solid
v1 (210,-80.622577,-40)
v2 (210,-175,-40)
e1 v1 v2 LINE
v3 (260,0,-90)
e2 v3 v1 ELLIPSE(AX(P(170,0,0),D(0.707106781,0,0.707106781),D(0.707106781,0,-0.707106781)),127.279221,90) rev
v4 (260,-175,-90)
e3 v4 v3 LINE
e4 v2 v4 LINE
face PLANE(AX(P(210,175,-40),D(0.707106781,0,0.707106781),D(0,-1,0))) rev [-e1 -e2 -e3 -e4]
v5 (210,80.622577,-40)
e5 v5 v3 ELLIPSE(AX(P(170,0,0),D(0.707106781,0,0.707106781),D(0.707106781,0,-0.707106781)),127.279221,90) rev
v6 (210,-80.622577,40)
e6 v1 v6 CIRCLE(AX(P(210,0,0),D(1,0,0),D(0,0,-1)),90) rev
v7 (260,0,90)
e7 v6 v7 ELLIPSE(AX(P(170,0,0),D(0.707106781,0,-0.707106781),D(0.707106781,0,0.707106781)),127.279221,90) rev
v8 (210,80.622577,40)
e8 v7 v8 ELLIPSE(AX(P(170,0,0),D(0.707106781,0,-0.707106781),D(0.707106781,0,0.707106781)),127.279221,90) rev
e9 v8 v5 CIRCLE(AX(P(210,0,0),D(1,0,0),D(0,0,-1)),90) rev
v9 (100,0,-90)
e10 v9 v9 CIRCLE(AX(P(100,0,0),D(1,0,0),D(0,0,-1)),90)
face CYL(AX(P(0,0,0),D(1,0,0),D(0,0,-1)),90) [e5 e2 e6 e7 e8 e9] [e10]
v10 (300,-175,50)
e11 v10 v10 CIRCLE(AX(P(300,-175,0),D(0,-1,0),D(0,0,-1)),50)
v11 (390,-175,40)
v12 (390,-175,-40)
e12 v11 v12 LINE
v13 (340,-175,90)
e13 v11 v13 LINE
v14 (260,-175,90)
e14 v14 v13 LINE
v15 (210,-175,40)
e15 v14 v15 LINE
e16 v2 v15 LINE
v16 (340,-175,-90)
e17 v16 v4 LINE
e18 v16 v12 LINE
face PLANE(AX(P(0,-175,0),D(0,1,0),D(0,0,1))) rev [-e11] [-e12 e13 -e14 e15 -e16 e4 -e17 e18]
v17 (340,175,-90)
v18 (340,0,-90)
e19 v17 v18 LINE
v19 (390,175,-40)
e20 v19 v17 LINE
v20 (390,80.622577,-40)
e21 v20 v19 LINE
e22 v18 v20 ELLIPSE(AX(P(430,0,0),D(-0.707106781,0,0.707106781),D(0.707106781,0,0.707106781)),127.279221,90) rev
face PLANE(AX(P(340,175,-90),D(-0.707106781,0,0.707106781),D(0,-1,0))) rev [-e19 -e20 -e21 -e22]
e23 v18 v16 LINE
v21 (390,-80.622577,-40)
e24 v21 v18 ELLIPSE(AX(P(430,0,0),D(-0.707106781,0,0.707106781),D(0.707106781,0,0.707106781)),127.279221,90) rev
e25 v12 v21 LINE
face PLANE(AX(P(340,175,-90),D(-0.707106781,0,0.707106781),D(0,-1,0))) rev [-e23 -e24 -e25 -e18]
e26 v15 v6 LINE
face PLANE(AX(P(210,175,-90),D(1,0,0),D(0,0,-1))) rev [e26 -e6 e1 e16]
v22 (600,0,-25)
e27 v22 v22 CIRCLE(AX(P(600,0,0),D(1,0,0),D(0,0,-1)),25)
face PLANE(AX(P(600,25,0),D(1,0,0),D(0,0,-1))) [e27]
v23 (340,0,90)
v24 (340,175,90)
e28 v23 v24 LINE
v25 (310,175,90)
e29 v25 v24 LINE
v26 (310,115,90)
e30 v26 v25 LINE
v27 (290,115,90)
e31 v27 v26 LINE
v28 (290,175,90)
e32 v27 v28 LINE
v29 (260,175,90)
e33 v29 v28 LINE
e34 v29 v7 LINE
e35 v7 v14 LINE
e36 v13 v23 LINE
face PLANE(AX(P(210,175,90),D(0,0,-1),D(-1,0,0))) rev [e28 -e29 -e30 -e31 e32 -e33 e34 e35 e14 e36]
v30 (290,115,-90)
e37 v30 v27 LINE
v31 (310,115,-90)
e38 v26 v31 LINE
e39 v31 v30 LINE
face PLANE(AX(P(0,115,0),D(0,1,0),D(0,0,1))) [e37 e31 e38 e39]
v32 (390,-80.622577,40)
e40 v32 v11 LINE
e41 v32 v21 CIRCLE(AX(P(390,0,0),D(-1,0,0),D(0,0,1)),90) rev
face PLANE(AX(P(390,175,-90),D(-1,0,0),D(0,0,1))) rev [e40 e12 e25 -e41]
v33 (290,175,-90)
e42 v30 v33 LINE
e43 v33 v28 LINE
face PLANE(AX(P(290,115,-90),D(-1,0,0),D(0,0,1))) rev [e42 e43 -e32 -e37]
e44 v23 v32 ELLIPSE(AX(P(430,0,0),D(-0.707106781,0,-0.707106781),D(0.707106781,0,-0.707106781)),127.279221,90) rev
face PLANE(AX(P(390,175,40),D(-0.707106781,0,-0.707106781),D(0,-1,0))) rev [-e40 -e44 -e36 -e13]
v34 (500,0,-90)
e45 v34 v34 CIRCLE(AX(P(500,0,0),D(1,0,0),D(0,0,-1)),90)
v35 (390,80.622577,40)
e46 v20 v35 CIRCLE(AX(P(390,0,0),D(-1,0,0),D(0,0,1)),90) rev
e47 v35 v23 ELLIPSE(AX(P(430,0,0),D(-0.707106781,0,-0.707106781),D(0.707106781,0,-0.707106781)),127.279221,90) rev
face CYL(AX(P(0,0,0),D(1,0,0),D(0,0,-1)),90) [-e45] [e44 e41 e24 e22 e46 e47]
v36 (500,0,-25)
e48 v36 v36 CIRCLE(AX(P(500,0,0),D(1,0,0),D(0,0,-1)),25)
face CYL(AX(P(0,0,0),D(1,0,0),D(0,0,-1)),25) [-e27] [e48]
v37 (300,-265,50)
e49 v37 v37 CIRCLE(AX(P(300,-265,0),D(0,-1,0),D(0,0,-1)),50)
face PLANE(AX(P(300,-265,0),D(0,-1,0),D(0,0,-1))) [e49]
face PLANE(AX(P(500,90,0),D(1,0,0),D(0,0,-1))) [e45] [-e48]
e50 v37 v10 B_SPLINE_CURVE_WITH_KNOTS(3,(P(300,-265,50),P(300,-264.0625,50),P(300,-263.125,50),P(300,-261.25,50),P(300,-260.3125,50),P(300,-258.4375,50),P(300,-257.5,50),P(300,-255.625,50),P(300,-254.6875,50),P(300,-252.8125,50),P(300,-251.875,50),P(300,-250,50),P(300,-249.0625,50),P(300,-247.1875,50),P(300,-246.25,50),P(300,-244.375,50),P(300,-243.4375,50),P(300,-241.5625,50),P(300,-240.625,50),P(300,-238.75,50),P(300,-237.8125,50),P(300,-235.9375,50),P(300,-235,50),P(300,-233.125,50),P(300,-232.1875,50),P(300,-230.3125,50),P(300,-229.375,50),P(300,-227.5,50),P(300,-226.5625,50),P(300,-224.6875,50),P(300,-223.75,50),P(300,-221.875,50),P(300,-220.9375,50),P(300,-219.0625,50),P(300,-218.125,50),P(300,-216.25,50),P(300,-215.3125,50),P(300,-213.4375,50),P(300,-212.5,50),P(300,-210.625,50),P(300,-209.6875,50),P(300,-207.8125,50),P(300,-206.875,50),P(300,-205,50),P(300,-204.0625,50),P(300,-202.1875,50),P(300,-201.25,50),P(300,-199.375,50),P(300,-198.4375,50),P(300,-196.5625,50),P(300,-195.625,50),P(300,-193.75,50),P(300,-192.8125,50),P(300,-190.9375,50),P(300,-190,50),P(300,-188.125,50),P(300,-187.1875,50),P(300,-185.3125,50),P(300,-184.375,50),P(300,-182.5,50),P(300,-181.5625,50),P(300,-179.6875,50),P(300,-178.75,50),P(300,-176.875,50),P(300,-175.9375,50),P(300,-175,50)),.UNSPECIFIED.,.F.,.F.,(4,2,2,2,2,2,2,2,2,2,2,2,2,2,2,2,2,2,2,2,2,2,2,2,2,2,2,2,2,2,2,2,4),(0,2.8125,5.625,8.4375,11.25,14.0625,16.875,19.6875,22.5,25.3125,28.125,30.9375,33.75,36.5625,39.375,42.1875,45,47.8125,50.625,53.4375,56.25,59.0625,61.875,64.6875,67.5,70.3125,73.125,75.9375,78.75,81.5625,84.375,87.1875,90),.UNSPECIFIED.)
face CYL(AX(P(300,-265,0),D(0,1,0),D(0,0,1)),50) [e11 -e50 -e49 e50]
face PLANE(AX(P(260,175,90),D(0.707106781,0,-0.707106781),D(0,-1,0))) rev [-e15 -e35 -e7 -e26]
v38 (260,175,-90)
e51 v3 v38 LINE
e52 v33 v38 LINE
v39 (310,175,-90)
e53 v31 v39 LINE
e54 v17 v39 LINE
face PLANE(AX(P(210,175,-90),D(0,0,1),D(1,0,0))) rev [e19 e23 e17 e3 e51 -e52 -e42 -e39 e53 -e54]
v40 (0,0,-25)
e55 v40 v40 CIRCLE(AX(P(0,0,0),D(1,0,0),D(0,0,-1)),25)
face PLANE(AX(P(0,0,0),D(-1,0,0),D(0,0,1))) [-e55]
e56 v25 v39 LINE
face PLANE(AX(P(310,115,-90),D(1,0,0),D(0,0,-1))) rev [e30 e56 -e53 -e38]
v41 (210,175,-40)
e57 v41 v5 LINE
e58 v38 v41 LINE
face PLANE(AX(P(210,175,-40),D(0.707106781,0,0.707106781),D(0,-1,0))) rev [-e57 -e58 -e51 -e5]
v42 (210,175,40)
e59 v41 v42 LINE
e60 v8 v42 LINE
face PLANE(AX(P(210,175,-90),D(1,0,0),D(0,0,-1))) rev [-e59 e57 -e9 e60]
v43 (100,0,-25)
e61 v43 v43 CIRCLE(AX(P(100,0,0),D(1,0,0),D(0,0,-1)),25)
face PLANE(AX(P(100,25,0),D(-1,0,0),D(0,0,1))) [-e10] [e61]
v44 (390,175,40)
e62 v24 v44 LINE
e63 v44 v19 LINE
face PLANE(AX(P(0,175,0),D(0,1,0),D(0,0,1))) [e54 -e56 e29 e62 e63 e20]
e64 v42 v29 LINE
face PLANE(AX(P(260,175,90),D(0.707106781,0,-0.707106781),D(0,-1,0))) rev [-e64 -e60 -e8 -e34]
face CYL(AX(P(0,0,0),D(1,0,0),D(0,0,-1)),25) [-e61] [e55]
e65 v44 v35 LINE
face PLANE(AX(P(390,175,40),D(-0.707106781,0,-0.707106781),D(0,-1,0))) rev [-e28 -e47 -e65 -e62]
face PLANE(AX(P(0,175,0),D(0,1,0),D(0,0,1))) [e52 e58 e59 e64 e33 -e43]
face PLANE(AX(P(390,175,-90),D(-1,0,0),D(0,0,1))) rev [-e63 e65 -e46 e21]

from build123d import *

# Parameters (mm, degrees)
SKETCH4_W           = 180
SKETCH4_H           = 180
BOSS_EXTRUDE2_DEPTH = 175
SKETCH5_R           = 50
BOSS_EXTRUDE3_DEPTH = 90
CHAMFER1_SIZE       = 50
SKETCH6_W           = 20
SKETCH6_H           = 180
CUT_EXTRUDE1_DEPTH  = 60


with BuildPart() as part:
    # Sketch3 → Revolve1 (revolve)
    with BuildSketch(Plane.XY, mode=Mode.PRIVATE) as revolve1_sk:
        Polygon((0, 0), (0, 25), (100, 25), (100, 90), (500, 90), (500, 25), (600, 25), (600, 0), align=None)
    revolve(revolve1_sk.sketch.rotate(Axis((0, 0, 0), (-1, 0, 0)), 90), axis=Axis((0, 0, 0), (-1, 0, 0)))

    # Sketch4 → Boss-Extrude2 (add, symmetric)
    with BuildSketch(Plane(origin=(0, 0, 0), x_dir=(1, 0, 0), z_dir=(0, 1, 0))):
        with Locations((300, 0)):
            Rectangle(SKETCH4_W, SKETCH4_H)
    extrude(amount=BOSS_EXTRUDE2_DEPTH, both=True)

    # Sketch5 → Boss-Extrude3 (add)
    with BuildSketch(Plane.XZ.offset(175)):
        with Locations(Location((300, 0, 0), (0, 0, 90))):
            Circle(SKETCH5_R)
    extrude(amount=BOSS_EXTRUDE3_DEPTH)

    # Chamfer1
    # the kernel refuses this chamfer: 50 mm, written as the material it takes off along each edge
    with BuildSketch(Plane(origin=(210, -303.584149398, -90), x_dir=(-0.027495876610586594, 0, 0.9996219169112966), z_dir=(0, 1, 0))) as chamfer1_piece_1_section:
        Polygon((CHAMFER1_SIZE * 0.999621916911, CHAMFER1_SIZE * 0.0274958766106), (-CHAMFER1_SIZE * 0.0274958766106, CHAMFER1_SIZE * 0.999621916911), (0, 0), align=None)
    chamfer1_piece_1 = extrude(amount=303.584149398, mode=Mode.PRIVATE)
    chamfer1_piece_1 = chamfer1_piece_1 - Plane(origin=(227.472268945, 0, 0), x_dir=(0, 0, -1), z_dir=(1, 0, 0)) * Cylinder(90, 808, mode=Mode.PRIVATE)
    add(chamfer1_piece_1, mode=Mode.SUBTRACT)
    with BuildSketch(Plane(origin=(210, -303.584149398, 90), x_dir=(-0.027495876610586598, 0, -0.9996219169112966), z_dir=(0, 1, 0))) as chamfer1_piece_2_section:
        Polygon((CHAMFER1_SIZE * 0.999621916911, -CHAMFER1_SIZE * 0.0274958766106), (-CHAMFER1_SIZE * 0.0274958766106, -CHAMFER1_SIZE * 0.999621916911), (0, 0), align=None)
    chamfer1_piece_2 = extrude(amount=303.584149398, mode=Mode.PRIVATE)
    chamfer1_piece_2 = chamfer1_piece_2 - Plane(origin=(227.472268938, 0, 0), x_dir=(0, 0, -1), z_dir=(1, 0, 0)) * Cylinder(90, 808, mode=Mode.PRIVATE)
    add(chamfer1_piece_2, mode=Mode.SUBTRACT)
    with BuildSketch(Plane(origin=(390, 0, 90), x_dir=(-0.9996219169112966, 0, 0.02749587661058631), z_dir=(0, -1, 0))) as chamfer1_piece_3_section:
        Polygon((CHAMFER1_SIZE * 0.999621916911, CHAMFER1_SIZE * 0.0274958766106), (-CHAMFER1_SIZE * 0.0274958766106, CHAMFER1_SIZE * 0.999621916911), (0, 0), align=None)
    chamfer1_piece_3 = extrude(amount=303.584149398, mode=Mode.PRIVATE)
    chamfer1_piece_3 = chamfer1_piece_3 - Plane(origin=(372.527731062, 0, 0), x_dir=(0, 0, -1), z_dir=(1, 0, 0)) * Cylinder(90, 808, mode=Mode.PRIVATE)
    add(chamfer1_piece_3, mode=Mode.SUBTRACT)
    with BuildSketch(Plane(origin=(390, 303.584149398, -90), x_dir=(-0.9996219169112966, 0, -0.02749587661058631), z_dir=(0, -1, 0))) as chamfer1_piece_4_section:
        Polygon((CHAMFER1_SIZE * 0.999621916911, -CHAMFER1_SIZE * 0.0274958766106), (-CHAMFER1_SIZE * 0.0274958766106, -CHAMFER1_SIZE * 0.999621916911), (0, 0), align=None)
    chamfer1_piece_4 = extrude(amount=303.584149398, mode=Mode.PRIVATE)
    chamfer1_piece_4 = chamfer1_piece_4 - Plane(origin=(372.527731055, 0, 0), x_dir=(0, 0, -1), z_dir=(1, 0, 0)) * Cylinder(90, 808, mode=Mode.PRIVATE)
    add(chamfer1_piece_4, mode=Mode.SUBTRACT)
    with BuildSketch(Plane(origin=(210, 0, -90), x_dir=(-0.027495876610586594, 0, 0.9996219169112966), z_dir=(0, 1, 0))) as chamfer1_piece_5_section:
        Polygon((CHAMFER1_SIZE * 0.999621916911, CHAMFER1_SIZE * 0.0274958766106), (-CHAMFER1_SIZE * 0.0274958766106, CHAMFER1_SIZE * 0.999621916911), (0, 0), align=None)
    chamfer1_piece_5 = extrude(amount=303.584149398, mode=Mode.PRIVATE)
    chamfer1_piece_5 = chamfer1_piece_5 - Plane(origin=(227.472268945, 0, 0), x_dir=(0, 0, -1), z_dir=(1, 0, 0)) * Cylinder(90, 808, mode=Mode.PRIVATE)
    add(chamfer1_piece_5, mode=Mode.SUBTRACT)
    with BuildSketch(Plane(origin=(210, 0, 90), x_dir=(-0.027495876610586598, 0, -0.9996219169112966), z_dir=(0, 1, 0))) as chamfer1_piece_6_section:
        Polygon((CHAMFER1_SIZE * 0.999621916911, -CHAMFER1_SIZE * 0.0274958766106), (-CHAMFER1_SIZE * 0.0274958766106, -CHAMFER1_SIZE * 0.999621916911), (0, 0), align=None)
    chamfer1_piece_6 = extrude(amount=303.584149398, mode=Mode.PRIVATE)
    chamfer1_piece_6 = chamfer1_piece_6 - Plane(origin=(227.472268947, 0, 0), x_dir=(0, 0, -1), z_dir=(1, 0, 0)) * Cylinder(90, 808, mode=Mode.PRIVATE)
    add(chamfer1_piece_6, mode=Mode.SUBTRACT)
    with BuildSketch(Plane(origin=(390, 303.584149398, 90), x_dir=(-0.9996219169112966, 0, 0.02749587661058631), z_dir=(0, -1, 0))) as chamfer1_piece_7_section:
        Polygon((CHAMFER1_SIZE * 0.999621916911, CHAMFER1_SIZE * 0.0274958766106), (-CHAMFER1_SIZE * 0.0274958766106, CHAMFER1_SIZE * 0.999621916911), (0, 0), align=None)
    chamfer1_piece_7 = extrude(amount=303.584149398, mode=Mode.PRIVATE)
    chamfer1_piece_7 = chamfer1_piece_7 - Plane(origin=(372.527731053, 0, 0), x_dir=(0, 0, -1), z_dir=(1, 0, 0)) * Cylinder(90, 808, mode=Mode.PRIVATE)
    add(chamfer1_piece_7, mode=Mode.SUBTRACT)
    with BuildSketch(Plane(origin=(390, 0, -90), x_dir=(-0.9996219169112966, 0, -0.02749587661058631), z_dir=(0, -1, 0))) as chamfer1_piece_8_section:
        Polygon((CHAMFER1_SIZE * 0.999621916911, -CHAMFER1_SIZE * 0.0274958766106), (-CHAMFER1_SIZE * 0.0274958766106, -CHAMFER1_SIZE * 0.999621916911), (0, 0), align=None)
    chamfer1_piece_8 = extrude(amount=303.584149398, mode=Mode.PRIVATE)
    chamfer1_piece_8 = chamfer1_piece_8 - Plane(origin=(372.527731055, 0, 0), x_dir=(0, 0, -1), z_dir=(1, 0, 0)) * Cylinder(90, 808, mode=Mode.PRIVATE)
    add(chamfer1_piece_8, mode=Mode.SUBTRACT)

    # Sketch6 → Cut-Extrude1 (cut)
    with BuildSketch(Plane(origin=(0, 175, 0), x_dir=(1, 0, 0), z_dir=(0, 1, 0))):
        with Locations((300, 0)):
            Rectangle(SKETCH6_W, SKETCH6_H)
    extrude(amount=-CUT_EXTRUDE1_DEPTH, mode=Mode.SUBTRACT)


solid = part.part
